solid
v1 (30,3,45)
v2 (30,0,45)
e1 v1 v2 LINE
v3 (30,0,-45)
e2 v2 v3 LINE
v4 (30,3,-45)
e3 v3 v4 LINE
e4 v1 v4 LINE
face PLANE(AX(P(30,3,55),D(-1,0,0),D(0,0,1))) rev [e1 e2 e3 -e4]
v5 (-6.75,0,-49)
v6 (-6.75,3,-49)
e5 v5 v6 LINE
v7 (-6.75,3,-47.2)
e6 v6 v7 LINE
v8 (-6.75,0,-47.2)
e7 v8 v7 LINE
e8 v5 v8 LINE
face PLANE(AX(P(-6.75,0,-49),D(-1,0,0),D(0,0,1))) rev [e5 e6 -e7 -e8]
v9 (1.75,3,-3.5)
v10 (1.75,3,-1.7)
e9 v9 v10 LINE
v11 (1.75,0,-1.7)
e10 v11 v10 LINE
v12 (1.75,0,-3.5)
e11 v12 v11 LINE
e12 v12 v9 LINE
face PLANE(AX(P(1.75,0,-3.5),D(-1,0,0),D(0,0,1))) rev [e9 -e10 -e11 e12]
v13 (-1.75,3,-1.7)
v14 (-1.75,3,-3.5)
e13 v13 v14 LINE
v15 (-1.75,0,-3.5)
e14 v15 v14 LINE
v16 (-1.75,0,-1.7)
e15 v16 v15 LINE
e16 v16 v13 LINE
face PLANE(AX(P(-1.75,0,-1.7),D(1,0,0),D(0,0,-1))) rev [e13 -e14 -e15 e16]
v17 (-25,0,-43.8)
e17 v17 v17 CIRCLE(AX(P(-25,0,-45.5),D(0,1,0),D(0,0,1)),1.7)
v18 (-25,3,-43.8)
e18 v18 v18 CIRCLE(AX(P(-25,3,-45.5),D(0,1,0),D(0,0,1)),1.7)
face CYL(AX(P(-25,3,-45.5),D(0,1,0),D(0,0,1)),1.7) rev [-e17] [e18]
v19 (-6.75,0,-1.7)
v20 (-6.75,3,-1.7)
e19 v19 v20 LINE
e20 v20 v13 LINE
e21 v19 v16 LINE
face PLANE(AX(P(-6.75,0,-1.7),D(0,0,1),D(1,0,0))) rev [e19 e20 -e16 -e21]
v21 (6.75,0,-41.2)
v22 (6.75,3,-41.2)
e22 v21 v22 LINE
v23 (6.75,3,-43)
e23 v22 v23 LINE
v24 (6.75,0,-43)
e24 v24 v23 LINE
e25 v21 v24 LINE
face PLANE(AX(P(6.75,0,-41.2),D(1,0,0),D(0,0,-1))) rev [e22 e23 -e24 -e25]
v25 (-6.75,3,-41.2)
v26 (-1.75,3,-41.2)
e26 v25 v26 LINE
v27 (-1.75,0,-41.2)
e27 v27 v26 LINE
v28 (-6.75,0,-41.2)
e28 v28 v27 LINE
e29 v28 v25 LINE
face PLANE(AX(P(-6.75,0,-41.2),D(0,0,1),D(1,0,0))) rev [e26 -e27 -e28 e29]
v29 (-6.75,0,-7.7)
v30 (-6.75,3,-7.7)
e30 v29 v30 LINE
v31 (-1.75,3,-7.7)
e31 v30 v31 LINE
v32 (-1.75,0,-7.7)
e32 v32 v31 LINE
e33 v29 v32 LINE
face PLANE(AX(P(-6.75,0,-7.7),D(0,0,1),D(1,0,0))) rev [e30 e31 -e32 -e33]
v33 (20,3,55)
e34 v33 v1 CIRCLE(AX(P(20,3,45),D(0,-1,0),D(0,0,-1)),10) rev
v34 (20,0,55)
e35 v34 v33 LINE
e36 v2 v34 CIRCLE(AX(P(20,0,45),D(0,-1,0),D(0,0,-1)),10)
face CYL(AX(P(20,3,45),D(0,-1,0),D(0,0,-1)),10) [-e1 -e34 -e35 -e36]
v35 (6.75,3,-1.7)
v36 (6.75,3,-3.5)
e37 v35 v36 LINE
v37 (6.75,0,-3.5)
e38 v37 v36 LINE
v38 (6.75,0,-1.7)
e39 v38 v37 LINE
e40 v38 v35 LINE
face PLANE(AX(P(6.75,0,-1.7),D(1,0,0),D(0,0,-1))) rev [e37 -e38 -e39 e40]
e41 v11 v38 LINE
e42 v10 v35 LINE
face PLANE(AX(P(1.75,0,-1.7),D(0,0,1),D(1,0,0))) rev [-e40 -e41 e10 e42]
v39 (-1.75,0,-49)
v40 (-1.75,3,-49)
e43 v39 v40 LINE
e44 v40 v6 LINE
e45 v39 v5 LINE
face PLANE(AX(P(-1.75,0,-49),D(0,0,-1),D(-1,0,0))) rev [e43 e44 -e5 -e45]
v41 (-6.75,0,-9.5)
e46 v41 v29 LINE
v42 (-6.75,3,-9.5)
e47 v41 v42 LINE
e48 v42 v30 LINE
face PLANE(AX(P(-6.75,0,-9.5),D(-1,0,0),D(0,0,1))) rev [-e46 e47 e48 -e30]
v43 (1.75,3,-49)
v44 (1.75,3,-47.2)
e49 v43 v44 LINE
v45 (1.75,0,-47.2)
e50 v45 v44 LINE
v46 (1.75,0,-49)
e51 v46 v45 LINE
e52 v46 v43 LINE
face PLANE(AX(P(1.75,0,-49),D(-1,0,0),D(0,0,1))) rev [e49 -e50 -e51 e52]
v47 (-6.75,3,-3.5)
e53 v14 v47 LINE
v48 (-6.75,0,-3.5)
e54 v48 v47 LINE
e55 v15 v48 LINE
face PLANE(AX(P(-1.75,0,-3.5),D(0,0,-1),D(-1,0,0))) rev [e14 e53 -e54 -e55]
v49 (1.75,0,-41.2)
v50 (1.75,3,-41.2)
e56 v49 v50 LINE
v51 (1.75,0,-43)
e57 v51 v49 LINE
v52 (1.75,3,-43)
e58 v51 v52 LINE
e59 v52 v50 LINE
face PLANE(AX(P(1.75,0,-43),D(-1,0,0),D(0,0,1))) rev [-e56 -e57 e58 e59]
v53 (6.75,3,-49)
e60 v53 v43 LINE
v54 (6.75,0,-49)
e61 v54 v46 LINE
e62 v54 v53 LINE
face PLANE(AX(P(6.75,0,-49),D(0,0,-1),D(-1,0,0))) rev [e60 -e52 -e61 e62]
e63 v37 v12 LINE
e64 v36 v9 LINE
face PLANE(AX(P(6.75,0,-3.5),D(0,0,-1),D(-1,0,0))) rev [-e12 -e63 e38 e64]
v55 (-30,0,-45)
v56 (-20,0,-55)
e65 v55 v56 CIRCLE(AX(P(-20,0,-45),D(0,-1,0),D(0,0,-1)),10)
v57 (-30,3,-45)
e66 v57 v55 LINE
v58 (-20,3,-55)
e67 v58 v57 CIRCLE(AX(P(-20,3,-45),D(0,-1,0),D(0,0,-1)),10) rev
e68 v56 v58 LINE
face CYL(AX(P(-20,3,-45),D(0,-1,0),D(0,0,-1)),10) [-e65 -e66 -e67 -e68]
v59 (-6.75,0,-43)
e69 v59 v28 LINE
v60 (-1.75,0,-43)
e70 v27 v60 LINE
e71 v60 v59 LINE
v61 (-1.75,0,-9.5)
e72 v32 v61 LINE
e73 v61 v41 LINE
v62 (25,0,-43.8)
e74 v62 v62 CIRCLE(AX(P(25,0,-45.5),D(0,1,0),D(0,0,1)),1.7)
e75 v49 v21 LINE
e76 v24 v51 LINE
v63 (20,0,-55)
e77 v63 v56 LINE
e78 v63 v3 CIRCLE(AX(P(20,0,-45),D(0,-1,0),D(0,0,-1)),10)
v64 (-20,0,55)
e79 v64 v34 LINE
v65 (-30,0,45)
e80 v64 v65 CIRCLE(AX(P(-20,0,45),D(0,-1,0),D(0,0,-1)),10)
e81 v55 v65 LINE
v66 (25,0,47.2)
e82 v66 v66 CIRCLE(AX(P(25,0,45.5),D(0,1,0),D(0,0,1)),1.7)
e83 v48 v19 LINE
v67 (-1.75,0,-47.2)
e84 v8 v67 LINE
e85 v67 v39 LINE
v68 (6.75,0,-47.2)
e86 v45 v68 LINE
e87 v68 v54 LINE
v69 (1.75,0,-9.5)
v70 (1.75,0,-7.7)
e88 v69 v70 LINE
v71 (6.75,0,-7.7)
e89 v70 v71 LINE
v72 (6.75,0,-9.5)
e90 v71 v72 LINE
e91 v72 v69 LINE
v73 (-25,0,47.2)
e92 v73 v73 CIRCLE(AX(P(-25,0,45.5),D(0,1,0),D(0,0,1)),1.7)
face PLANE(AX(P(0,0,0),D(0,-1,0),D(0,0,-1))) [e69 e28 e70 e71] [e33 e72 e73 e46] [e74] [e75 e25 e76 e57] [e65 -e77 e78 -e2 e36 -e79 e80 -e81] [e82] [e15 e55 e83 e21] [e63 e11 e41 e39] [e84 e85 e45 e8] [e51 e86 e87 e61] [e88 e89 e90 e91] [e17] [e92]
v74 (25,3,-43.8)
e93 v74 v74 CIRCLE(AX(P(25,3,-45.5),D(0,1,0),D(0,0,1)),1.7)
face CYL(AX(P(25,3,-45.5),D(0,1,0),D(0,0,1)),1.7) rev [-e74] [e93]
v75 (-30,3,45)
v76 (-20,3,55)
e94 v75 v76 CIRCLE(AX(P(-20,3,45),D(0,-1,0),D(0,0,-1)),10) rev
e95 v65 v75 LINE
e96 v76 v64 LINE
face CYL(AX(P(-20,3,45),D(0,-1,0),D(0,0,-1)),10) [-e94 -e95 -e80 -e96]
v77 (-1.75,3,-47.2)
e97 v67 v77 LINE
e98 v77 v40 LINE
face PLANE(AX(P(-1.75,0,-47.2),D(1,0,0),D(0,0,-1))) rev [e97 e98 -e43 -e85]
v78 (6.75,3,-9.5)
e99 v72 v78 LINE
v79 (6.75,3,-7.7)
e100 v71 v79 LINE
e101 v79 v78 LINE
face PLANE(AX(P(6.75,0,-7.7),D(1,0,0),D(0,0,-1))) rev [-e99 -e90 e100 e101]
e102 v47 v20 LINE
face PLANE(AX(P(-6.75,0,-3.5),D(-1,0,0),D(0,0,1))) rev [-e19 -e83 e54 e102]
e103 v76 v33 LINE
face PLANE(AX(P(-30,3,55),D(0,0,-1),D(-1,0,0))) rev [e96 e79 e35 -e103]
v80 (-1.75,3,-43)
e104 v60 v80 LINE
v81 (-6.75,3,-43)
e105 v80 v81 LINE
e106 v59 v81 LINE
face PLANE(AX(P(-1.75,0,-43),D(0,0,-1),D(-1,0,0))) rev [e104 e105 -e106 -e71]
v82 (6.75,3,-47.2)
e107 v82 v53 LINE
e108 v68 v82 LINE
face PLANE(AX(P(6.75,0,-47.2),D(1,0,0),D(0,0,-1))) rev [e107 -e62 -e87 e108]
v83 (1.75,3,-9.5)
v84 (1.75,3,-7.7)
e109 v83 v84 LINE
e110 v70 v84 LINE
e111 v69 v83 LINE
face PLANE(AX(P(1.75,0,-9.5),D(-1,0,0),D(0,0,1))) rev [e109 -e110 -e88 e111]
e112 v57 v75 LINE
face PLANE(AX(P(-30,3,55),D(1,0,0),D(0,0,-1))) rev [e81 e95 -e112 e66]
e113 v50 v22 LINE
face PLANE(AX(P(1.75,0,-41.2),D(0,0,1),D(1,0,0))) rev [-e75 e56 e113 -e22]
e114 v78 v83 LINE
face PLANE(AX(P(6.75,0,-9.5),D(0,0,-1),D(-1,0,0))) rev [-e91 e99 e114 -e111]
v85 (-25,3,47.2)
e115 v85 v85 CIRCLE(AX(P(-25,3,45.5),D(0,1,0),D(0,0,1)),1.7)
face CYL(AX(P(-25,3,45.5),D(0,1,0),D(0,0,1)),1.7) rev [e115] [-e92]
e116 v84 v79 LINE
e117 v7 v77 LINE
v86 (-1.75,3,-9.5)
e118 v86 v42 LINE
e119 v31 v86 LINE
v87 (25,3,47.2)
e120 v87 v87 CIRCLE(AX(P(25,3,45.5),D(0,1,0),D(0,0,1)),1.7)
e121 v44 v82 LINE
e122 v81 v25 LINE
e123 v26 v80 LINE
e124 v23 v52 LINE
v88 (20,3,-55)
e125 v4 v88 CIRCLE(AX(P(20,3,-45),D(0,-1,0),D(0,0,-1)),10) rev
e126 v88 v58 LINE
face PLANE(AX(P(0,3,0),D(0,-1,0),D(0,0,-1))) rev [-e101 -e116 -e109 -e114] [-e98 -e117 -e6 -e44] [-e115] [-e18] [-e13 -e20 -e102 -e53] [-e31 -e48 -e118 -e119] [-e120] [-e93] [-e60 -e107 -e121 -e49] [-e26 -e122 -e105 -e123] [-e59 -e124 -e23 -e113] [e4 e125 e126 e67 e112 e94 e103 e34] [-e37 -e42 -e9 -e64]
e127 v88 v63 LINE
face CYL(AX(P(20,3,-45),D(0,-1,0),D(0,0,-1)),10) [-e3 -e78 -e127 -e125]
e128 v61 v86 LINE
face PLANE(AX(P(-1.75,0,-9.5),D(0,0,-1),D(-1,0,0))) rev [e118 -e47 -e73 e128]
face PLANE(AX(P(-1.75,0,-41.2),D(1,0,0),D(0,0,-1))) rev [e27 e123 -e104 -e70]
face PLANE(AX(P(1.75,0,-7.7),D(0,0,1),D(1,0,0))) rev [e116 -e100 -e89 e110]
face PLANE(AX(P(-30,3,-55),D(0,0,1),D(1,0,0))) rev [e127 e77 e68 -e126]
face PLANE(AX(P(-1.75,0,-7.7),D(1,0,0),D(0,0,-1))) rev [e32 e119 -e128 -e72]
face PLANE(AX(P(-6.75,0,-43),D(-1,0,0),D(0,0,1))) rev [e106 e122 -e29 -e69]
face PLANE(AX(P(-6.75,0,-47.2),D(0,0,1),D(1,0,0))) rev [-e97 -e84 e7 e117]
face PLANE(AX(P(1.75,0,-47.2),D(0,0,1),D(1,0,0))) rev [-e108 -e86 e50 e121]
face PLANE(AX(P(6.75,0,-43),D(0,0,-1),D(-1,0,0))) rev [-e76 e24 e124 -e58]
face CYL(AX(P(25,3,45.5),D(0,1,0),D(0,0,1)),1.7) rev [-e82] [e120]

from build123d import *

# Parameters (mm, degrees)
SKETCH1_W             = 60
SKETCH1_H             = 110
BOSS_EXTRUDE1_DEPTH   = 3
FILLET2_R             = 10
M3_CLEARANCE_HOLE1_D  = 3.4
DELETEFACE1_OUTLINE_R = 1.7
DELETEFACE1_DEPTH     = 3
SKETCH6_W             = 5
SKETCH6_H             = 1.8
CUT_EXTRUDE3_DEPTH    = 63.721607122


# Read off the part's stored shape, not the designer's step: DeleteFace1
with BuildPart() as part:
    # Sketch1 → Boss-Extrude1 (new body)
    with BuildSketch(Plane(origin=(0, 0, 0), x_dir=(1, 0, 0), z_dir=(0, 1, 0))):
        Rectangle(SKETCH1_W, SKETCH1_H)
    extrude(amount=BOSS_EXTRUDE1_DEPTH)

    # Fillet2
    fillet2_edges = [part.edges().sort_by_distance(p)[0] for p in [
        (30, 1.5, 55),
        (-30, 1.5, 55),
        (-30, 1.5, -55),
        (30, 1.5, -55),
    ]]
    fillet(fillet2_edges, radius=FILLET2_R)

    # M3 Clearance Hole1 (through all)
    with Locations(Plane(origin=(0, 3, 0), x_dir=(1, 0, 0), z_dir=(0, 1, 0))):
        with Locations((0, 0), (25, 45.5), (-25, -45.5), (-25, 45.5), (25, -45.5)):
            Hole(M3_CLEARANCE_HOLE1_D / 2)

    # DeleteFace1 outline → DeleteFace1 (add)
    with BuildSketch(Plane(origin=(0, 0, 0), x_dir=(1, 0, 0), z_dir=(0, 1, 0))):
        Circle(DELETEFACE1_OUTLINE_R)
    extrude(amount=DELETEFACE1_DEPTH)

    # Sketch6 → Cut-Extrude3 (cut, through all)
    with BuildSketch(Plane(origin=(0, 3, 0), x_dir=(1, 0, 0), z_dir=(0, 1, 0))):
        with Locations((-4.25, 2.6)):
            Rectangle(SKETCH6_W, SKETCH6_H)
        with Locations((4.25, 2.6)):
            Rectangle(SKETCH6_W, SKETCH6_H)
        with Locations((4.25, 8.6)):
            Rectangle(SKETCH6_W, SKETCH6_H)
        with Locations((-4.25, 8.6)):
            Rectangle(SKETCH6_W, SKETCH6_H)
        with Locations((-4.25, 42.1)):
            Rectangle(SKETCH6_W, SKETCH6_H)
        with Locations((-4.25, 48.1)):
            Rectangle(SKETCH6_W, SKETCH6_H)
        with Locations((4.25, 48.1)):
            Rectangle(SKETCH6_W, SKETCH6_H)
        with Locations((4.25, 42.1)):
            Rectangle(SKETCH6_W, SKETCH6_H)
    extrude(amount=-CUT_EXTRUDE3_DEPTH, mode=Mode.SUBTRACT)


solid = part.part
